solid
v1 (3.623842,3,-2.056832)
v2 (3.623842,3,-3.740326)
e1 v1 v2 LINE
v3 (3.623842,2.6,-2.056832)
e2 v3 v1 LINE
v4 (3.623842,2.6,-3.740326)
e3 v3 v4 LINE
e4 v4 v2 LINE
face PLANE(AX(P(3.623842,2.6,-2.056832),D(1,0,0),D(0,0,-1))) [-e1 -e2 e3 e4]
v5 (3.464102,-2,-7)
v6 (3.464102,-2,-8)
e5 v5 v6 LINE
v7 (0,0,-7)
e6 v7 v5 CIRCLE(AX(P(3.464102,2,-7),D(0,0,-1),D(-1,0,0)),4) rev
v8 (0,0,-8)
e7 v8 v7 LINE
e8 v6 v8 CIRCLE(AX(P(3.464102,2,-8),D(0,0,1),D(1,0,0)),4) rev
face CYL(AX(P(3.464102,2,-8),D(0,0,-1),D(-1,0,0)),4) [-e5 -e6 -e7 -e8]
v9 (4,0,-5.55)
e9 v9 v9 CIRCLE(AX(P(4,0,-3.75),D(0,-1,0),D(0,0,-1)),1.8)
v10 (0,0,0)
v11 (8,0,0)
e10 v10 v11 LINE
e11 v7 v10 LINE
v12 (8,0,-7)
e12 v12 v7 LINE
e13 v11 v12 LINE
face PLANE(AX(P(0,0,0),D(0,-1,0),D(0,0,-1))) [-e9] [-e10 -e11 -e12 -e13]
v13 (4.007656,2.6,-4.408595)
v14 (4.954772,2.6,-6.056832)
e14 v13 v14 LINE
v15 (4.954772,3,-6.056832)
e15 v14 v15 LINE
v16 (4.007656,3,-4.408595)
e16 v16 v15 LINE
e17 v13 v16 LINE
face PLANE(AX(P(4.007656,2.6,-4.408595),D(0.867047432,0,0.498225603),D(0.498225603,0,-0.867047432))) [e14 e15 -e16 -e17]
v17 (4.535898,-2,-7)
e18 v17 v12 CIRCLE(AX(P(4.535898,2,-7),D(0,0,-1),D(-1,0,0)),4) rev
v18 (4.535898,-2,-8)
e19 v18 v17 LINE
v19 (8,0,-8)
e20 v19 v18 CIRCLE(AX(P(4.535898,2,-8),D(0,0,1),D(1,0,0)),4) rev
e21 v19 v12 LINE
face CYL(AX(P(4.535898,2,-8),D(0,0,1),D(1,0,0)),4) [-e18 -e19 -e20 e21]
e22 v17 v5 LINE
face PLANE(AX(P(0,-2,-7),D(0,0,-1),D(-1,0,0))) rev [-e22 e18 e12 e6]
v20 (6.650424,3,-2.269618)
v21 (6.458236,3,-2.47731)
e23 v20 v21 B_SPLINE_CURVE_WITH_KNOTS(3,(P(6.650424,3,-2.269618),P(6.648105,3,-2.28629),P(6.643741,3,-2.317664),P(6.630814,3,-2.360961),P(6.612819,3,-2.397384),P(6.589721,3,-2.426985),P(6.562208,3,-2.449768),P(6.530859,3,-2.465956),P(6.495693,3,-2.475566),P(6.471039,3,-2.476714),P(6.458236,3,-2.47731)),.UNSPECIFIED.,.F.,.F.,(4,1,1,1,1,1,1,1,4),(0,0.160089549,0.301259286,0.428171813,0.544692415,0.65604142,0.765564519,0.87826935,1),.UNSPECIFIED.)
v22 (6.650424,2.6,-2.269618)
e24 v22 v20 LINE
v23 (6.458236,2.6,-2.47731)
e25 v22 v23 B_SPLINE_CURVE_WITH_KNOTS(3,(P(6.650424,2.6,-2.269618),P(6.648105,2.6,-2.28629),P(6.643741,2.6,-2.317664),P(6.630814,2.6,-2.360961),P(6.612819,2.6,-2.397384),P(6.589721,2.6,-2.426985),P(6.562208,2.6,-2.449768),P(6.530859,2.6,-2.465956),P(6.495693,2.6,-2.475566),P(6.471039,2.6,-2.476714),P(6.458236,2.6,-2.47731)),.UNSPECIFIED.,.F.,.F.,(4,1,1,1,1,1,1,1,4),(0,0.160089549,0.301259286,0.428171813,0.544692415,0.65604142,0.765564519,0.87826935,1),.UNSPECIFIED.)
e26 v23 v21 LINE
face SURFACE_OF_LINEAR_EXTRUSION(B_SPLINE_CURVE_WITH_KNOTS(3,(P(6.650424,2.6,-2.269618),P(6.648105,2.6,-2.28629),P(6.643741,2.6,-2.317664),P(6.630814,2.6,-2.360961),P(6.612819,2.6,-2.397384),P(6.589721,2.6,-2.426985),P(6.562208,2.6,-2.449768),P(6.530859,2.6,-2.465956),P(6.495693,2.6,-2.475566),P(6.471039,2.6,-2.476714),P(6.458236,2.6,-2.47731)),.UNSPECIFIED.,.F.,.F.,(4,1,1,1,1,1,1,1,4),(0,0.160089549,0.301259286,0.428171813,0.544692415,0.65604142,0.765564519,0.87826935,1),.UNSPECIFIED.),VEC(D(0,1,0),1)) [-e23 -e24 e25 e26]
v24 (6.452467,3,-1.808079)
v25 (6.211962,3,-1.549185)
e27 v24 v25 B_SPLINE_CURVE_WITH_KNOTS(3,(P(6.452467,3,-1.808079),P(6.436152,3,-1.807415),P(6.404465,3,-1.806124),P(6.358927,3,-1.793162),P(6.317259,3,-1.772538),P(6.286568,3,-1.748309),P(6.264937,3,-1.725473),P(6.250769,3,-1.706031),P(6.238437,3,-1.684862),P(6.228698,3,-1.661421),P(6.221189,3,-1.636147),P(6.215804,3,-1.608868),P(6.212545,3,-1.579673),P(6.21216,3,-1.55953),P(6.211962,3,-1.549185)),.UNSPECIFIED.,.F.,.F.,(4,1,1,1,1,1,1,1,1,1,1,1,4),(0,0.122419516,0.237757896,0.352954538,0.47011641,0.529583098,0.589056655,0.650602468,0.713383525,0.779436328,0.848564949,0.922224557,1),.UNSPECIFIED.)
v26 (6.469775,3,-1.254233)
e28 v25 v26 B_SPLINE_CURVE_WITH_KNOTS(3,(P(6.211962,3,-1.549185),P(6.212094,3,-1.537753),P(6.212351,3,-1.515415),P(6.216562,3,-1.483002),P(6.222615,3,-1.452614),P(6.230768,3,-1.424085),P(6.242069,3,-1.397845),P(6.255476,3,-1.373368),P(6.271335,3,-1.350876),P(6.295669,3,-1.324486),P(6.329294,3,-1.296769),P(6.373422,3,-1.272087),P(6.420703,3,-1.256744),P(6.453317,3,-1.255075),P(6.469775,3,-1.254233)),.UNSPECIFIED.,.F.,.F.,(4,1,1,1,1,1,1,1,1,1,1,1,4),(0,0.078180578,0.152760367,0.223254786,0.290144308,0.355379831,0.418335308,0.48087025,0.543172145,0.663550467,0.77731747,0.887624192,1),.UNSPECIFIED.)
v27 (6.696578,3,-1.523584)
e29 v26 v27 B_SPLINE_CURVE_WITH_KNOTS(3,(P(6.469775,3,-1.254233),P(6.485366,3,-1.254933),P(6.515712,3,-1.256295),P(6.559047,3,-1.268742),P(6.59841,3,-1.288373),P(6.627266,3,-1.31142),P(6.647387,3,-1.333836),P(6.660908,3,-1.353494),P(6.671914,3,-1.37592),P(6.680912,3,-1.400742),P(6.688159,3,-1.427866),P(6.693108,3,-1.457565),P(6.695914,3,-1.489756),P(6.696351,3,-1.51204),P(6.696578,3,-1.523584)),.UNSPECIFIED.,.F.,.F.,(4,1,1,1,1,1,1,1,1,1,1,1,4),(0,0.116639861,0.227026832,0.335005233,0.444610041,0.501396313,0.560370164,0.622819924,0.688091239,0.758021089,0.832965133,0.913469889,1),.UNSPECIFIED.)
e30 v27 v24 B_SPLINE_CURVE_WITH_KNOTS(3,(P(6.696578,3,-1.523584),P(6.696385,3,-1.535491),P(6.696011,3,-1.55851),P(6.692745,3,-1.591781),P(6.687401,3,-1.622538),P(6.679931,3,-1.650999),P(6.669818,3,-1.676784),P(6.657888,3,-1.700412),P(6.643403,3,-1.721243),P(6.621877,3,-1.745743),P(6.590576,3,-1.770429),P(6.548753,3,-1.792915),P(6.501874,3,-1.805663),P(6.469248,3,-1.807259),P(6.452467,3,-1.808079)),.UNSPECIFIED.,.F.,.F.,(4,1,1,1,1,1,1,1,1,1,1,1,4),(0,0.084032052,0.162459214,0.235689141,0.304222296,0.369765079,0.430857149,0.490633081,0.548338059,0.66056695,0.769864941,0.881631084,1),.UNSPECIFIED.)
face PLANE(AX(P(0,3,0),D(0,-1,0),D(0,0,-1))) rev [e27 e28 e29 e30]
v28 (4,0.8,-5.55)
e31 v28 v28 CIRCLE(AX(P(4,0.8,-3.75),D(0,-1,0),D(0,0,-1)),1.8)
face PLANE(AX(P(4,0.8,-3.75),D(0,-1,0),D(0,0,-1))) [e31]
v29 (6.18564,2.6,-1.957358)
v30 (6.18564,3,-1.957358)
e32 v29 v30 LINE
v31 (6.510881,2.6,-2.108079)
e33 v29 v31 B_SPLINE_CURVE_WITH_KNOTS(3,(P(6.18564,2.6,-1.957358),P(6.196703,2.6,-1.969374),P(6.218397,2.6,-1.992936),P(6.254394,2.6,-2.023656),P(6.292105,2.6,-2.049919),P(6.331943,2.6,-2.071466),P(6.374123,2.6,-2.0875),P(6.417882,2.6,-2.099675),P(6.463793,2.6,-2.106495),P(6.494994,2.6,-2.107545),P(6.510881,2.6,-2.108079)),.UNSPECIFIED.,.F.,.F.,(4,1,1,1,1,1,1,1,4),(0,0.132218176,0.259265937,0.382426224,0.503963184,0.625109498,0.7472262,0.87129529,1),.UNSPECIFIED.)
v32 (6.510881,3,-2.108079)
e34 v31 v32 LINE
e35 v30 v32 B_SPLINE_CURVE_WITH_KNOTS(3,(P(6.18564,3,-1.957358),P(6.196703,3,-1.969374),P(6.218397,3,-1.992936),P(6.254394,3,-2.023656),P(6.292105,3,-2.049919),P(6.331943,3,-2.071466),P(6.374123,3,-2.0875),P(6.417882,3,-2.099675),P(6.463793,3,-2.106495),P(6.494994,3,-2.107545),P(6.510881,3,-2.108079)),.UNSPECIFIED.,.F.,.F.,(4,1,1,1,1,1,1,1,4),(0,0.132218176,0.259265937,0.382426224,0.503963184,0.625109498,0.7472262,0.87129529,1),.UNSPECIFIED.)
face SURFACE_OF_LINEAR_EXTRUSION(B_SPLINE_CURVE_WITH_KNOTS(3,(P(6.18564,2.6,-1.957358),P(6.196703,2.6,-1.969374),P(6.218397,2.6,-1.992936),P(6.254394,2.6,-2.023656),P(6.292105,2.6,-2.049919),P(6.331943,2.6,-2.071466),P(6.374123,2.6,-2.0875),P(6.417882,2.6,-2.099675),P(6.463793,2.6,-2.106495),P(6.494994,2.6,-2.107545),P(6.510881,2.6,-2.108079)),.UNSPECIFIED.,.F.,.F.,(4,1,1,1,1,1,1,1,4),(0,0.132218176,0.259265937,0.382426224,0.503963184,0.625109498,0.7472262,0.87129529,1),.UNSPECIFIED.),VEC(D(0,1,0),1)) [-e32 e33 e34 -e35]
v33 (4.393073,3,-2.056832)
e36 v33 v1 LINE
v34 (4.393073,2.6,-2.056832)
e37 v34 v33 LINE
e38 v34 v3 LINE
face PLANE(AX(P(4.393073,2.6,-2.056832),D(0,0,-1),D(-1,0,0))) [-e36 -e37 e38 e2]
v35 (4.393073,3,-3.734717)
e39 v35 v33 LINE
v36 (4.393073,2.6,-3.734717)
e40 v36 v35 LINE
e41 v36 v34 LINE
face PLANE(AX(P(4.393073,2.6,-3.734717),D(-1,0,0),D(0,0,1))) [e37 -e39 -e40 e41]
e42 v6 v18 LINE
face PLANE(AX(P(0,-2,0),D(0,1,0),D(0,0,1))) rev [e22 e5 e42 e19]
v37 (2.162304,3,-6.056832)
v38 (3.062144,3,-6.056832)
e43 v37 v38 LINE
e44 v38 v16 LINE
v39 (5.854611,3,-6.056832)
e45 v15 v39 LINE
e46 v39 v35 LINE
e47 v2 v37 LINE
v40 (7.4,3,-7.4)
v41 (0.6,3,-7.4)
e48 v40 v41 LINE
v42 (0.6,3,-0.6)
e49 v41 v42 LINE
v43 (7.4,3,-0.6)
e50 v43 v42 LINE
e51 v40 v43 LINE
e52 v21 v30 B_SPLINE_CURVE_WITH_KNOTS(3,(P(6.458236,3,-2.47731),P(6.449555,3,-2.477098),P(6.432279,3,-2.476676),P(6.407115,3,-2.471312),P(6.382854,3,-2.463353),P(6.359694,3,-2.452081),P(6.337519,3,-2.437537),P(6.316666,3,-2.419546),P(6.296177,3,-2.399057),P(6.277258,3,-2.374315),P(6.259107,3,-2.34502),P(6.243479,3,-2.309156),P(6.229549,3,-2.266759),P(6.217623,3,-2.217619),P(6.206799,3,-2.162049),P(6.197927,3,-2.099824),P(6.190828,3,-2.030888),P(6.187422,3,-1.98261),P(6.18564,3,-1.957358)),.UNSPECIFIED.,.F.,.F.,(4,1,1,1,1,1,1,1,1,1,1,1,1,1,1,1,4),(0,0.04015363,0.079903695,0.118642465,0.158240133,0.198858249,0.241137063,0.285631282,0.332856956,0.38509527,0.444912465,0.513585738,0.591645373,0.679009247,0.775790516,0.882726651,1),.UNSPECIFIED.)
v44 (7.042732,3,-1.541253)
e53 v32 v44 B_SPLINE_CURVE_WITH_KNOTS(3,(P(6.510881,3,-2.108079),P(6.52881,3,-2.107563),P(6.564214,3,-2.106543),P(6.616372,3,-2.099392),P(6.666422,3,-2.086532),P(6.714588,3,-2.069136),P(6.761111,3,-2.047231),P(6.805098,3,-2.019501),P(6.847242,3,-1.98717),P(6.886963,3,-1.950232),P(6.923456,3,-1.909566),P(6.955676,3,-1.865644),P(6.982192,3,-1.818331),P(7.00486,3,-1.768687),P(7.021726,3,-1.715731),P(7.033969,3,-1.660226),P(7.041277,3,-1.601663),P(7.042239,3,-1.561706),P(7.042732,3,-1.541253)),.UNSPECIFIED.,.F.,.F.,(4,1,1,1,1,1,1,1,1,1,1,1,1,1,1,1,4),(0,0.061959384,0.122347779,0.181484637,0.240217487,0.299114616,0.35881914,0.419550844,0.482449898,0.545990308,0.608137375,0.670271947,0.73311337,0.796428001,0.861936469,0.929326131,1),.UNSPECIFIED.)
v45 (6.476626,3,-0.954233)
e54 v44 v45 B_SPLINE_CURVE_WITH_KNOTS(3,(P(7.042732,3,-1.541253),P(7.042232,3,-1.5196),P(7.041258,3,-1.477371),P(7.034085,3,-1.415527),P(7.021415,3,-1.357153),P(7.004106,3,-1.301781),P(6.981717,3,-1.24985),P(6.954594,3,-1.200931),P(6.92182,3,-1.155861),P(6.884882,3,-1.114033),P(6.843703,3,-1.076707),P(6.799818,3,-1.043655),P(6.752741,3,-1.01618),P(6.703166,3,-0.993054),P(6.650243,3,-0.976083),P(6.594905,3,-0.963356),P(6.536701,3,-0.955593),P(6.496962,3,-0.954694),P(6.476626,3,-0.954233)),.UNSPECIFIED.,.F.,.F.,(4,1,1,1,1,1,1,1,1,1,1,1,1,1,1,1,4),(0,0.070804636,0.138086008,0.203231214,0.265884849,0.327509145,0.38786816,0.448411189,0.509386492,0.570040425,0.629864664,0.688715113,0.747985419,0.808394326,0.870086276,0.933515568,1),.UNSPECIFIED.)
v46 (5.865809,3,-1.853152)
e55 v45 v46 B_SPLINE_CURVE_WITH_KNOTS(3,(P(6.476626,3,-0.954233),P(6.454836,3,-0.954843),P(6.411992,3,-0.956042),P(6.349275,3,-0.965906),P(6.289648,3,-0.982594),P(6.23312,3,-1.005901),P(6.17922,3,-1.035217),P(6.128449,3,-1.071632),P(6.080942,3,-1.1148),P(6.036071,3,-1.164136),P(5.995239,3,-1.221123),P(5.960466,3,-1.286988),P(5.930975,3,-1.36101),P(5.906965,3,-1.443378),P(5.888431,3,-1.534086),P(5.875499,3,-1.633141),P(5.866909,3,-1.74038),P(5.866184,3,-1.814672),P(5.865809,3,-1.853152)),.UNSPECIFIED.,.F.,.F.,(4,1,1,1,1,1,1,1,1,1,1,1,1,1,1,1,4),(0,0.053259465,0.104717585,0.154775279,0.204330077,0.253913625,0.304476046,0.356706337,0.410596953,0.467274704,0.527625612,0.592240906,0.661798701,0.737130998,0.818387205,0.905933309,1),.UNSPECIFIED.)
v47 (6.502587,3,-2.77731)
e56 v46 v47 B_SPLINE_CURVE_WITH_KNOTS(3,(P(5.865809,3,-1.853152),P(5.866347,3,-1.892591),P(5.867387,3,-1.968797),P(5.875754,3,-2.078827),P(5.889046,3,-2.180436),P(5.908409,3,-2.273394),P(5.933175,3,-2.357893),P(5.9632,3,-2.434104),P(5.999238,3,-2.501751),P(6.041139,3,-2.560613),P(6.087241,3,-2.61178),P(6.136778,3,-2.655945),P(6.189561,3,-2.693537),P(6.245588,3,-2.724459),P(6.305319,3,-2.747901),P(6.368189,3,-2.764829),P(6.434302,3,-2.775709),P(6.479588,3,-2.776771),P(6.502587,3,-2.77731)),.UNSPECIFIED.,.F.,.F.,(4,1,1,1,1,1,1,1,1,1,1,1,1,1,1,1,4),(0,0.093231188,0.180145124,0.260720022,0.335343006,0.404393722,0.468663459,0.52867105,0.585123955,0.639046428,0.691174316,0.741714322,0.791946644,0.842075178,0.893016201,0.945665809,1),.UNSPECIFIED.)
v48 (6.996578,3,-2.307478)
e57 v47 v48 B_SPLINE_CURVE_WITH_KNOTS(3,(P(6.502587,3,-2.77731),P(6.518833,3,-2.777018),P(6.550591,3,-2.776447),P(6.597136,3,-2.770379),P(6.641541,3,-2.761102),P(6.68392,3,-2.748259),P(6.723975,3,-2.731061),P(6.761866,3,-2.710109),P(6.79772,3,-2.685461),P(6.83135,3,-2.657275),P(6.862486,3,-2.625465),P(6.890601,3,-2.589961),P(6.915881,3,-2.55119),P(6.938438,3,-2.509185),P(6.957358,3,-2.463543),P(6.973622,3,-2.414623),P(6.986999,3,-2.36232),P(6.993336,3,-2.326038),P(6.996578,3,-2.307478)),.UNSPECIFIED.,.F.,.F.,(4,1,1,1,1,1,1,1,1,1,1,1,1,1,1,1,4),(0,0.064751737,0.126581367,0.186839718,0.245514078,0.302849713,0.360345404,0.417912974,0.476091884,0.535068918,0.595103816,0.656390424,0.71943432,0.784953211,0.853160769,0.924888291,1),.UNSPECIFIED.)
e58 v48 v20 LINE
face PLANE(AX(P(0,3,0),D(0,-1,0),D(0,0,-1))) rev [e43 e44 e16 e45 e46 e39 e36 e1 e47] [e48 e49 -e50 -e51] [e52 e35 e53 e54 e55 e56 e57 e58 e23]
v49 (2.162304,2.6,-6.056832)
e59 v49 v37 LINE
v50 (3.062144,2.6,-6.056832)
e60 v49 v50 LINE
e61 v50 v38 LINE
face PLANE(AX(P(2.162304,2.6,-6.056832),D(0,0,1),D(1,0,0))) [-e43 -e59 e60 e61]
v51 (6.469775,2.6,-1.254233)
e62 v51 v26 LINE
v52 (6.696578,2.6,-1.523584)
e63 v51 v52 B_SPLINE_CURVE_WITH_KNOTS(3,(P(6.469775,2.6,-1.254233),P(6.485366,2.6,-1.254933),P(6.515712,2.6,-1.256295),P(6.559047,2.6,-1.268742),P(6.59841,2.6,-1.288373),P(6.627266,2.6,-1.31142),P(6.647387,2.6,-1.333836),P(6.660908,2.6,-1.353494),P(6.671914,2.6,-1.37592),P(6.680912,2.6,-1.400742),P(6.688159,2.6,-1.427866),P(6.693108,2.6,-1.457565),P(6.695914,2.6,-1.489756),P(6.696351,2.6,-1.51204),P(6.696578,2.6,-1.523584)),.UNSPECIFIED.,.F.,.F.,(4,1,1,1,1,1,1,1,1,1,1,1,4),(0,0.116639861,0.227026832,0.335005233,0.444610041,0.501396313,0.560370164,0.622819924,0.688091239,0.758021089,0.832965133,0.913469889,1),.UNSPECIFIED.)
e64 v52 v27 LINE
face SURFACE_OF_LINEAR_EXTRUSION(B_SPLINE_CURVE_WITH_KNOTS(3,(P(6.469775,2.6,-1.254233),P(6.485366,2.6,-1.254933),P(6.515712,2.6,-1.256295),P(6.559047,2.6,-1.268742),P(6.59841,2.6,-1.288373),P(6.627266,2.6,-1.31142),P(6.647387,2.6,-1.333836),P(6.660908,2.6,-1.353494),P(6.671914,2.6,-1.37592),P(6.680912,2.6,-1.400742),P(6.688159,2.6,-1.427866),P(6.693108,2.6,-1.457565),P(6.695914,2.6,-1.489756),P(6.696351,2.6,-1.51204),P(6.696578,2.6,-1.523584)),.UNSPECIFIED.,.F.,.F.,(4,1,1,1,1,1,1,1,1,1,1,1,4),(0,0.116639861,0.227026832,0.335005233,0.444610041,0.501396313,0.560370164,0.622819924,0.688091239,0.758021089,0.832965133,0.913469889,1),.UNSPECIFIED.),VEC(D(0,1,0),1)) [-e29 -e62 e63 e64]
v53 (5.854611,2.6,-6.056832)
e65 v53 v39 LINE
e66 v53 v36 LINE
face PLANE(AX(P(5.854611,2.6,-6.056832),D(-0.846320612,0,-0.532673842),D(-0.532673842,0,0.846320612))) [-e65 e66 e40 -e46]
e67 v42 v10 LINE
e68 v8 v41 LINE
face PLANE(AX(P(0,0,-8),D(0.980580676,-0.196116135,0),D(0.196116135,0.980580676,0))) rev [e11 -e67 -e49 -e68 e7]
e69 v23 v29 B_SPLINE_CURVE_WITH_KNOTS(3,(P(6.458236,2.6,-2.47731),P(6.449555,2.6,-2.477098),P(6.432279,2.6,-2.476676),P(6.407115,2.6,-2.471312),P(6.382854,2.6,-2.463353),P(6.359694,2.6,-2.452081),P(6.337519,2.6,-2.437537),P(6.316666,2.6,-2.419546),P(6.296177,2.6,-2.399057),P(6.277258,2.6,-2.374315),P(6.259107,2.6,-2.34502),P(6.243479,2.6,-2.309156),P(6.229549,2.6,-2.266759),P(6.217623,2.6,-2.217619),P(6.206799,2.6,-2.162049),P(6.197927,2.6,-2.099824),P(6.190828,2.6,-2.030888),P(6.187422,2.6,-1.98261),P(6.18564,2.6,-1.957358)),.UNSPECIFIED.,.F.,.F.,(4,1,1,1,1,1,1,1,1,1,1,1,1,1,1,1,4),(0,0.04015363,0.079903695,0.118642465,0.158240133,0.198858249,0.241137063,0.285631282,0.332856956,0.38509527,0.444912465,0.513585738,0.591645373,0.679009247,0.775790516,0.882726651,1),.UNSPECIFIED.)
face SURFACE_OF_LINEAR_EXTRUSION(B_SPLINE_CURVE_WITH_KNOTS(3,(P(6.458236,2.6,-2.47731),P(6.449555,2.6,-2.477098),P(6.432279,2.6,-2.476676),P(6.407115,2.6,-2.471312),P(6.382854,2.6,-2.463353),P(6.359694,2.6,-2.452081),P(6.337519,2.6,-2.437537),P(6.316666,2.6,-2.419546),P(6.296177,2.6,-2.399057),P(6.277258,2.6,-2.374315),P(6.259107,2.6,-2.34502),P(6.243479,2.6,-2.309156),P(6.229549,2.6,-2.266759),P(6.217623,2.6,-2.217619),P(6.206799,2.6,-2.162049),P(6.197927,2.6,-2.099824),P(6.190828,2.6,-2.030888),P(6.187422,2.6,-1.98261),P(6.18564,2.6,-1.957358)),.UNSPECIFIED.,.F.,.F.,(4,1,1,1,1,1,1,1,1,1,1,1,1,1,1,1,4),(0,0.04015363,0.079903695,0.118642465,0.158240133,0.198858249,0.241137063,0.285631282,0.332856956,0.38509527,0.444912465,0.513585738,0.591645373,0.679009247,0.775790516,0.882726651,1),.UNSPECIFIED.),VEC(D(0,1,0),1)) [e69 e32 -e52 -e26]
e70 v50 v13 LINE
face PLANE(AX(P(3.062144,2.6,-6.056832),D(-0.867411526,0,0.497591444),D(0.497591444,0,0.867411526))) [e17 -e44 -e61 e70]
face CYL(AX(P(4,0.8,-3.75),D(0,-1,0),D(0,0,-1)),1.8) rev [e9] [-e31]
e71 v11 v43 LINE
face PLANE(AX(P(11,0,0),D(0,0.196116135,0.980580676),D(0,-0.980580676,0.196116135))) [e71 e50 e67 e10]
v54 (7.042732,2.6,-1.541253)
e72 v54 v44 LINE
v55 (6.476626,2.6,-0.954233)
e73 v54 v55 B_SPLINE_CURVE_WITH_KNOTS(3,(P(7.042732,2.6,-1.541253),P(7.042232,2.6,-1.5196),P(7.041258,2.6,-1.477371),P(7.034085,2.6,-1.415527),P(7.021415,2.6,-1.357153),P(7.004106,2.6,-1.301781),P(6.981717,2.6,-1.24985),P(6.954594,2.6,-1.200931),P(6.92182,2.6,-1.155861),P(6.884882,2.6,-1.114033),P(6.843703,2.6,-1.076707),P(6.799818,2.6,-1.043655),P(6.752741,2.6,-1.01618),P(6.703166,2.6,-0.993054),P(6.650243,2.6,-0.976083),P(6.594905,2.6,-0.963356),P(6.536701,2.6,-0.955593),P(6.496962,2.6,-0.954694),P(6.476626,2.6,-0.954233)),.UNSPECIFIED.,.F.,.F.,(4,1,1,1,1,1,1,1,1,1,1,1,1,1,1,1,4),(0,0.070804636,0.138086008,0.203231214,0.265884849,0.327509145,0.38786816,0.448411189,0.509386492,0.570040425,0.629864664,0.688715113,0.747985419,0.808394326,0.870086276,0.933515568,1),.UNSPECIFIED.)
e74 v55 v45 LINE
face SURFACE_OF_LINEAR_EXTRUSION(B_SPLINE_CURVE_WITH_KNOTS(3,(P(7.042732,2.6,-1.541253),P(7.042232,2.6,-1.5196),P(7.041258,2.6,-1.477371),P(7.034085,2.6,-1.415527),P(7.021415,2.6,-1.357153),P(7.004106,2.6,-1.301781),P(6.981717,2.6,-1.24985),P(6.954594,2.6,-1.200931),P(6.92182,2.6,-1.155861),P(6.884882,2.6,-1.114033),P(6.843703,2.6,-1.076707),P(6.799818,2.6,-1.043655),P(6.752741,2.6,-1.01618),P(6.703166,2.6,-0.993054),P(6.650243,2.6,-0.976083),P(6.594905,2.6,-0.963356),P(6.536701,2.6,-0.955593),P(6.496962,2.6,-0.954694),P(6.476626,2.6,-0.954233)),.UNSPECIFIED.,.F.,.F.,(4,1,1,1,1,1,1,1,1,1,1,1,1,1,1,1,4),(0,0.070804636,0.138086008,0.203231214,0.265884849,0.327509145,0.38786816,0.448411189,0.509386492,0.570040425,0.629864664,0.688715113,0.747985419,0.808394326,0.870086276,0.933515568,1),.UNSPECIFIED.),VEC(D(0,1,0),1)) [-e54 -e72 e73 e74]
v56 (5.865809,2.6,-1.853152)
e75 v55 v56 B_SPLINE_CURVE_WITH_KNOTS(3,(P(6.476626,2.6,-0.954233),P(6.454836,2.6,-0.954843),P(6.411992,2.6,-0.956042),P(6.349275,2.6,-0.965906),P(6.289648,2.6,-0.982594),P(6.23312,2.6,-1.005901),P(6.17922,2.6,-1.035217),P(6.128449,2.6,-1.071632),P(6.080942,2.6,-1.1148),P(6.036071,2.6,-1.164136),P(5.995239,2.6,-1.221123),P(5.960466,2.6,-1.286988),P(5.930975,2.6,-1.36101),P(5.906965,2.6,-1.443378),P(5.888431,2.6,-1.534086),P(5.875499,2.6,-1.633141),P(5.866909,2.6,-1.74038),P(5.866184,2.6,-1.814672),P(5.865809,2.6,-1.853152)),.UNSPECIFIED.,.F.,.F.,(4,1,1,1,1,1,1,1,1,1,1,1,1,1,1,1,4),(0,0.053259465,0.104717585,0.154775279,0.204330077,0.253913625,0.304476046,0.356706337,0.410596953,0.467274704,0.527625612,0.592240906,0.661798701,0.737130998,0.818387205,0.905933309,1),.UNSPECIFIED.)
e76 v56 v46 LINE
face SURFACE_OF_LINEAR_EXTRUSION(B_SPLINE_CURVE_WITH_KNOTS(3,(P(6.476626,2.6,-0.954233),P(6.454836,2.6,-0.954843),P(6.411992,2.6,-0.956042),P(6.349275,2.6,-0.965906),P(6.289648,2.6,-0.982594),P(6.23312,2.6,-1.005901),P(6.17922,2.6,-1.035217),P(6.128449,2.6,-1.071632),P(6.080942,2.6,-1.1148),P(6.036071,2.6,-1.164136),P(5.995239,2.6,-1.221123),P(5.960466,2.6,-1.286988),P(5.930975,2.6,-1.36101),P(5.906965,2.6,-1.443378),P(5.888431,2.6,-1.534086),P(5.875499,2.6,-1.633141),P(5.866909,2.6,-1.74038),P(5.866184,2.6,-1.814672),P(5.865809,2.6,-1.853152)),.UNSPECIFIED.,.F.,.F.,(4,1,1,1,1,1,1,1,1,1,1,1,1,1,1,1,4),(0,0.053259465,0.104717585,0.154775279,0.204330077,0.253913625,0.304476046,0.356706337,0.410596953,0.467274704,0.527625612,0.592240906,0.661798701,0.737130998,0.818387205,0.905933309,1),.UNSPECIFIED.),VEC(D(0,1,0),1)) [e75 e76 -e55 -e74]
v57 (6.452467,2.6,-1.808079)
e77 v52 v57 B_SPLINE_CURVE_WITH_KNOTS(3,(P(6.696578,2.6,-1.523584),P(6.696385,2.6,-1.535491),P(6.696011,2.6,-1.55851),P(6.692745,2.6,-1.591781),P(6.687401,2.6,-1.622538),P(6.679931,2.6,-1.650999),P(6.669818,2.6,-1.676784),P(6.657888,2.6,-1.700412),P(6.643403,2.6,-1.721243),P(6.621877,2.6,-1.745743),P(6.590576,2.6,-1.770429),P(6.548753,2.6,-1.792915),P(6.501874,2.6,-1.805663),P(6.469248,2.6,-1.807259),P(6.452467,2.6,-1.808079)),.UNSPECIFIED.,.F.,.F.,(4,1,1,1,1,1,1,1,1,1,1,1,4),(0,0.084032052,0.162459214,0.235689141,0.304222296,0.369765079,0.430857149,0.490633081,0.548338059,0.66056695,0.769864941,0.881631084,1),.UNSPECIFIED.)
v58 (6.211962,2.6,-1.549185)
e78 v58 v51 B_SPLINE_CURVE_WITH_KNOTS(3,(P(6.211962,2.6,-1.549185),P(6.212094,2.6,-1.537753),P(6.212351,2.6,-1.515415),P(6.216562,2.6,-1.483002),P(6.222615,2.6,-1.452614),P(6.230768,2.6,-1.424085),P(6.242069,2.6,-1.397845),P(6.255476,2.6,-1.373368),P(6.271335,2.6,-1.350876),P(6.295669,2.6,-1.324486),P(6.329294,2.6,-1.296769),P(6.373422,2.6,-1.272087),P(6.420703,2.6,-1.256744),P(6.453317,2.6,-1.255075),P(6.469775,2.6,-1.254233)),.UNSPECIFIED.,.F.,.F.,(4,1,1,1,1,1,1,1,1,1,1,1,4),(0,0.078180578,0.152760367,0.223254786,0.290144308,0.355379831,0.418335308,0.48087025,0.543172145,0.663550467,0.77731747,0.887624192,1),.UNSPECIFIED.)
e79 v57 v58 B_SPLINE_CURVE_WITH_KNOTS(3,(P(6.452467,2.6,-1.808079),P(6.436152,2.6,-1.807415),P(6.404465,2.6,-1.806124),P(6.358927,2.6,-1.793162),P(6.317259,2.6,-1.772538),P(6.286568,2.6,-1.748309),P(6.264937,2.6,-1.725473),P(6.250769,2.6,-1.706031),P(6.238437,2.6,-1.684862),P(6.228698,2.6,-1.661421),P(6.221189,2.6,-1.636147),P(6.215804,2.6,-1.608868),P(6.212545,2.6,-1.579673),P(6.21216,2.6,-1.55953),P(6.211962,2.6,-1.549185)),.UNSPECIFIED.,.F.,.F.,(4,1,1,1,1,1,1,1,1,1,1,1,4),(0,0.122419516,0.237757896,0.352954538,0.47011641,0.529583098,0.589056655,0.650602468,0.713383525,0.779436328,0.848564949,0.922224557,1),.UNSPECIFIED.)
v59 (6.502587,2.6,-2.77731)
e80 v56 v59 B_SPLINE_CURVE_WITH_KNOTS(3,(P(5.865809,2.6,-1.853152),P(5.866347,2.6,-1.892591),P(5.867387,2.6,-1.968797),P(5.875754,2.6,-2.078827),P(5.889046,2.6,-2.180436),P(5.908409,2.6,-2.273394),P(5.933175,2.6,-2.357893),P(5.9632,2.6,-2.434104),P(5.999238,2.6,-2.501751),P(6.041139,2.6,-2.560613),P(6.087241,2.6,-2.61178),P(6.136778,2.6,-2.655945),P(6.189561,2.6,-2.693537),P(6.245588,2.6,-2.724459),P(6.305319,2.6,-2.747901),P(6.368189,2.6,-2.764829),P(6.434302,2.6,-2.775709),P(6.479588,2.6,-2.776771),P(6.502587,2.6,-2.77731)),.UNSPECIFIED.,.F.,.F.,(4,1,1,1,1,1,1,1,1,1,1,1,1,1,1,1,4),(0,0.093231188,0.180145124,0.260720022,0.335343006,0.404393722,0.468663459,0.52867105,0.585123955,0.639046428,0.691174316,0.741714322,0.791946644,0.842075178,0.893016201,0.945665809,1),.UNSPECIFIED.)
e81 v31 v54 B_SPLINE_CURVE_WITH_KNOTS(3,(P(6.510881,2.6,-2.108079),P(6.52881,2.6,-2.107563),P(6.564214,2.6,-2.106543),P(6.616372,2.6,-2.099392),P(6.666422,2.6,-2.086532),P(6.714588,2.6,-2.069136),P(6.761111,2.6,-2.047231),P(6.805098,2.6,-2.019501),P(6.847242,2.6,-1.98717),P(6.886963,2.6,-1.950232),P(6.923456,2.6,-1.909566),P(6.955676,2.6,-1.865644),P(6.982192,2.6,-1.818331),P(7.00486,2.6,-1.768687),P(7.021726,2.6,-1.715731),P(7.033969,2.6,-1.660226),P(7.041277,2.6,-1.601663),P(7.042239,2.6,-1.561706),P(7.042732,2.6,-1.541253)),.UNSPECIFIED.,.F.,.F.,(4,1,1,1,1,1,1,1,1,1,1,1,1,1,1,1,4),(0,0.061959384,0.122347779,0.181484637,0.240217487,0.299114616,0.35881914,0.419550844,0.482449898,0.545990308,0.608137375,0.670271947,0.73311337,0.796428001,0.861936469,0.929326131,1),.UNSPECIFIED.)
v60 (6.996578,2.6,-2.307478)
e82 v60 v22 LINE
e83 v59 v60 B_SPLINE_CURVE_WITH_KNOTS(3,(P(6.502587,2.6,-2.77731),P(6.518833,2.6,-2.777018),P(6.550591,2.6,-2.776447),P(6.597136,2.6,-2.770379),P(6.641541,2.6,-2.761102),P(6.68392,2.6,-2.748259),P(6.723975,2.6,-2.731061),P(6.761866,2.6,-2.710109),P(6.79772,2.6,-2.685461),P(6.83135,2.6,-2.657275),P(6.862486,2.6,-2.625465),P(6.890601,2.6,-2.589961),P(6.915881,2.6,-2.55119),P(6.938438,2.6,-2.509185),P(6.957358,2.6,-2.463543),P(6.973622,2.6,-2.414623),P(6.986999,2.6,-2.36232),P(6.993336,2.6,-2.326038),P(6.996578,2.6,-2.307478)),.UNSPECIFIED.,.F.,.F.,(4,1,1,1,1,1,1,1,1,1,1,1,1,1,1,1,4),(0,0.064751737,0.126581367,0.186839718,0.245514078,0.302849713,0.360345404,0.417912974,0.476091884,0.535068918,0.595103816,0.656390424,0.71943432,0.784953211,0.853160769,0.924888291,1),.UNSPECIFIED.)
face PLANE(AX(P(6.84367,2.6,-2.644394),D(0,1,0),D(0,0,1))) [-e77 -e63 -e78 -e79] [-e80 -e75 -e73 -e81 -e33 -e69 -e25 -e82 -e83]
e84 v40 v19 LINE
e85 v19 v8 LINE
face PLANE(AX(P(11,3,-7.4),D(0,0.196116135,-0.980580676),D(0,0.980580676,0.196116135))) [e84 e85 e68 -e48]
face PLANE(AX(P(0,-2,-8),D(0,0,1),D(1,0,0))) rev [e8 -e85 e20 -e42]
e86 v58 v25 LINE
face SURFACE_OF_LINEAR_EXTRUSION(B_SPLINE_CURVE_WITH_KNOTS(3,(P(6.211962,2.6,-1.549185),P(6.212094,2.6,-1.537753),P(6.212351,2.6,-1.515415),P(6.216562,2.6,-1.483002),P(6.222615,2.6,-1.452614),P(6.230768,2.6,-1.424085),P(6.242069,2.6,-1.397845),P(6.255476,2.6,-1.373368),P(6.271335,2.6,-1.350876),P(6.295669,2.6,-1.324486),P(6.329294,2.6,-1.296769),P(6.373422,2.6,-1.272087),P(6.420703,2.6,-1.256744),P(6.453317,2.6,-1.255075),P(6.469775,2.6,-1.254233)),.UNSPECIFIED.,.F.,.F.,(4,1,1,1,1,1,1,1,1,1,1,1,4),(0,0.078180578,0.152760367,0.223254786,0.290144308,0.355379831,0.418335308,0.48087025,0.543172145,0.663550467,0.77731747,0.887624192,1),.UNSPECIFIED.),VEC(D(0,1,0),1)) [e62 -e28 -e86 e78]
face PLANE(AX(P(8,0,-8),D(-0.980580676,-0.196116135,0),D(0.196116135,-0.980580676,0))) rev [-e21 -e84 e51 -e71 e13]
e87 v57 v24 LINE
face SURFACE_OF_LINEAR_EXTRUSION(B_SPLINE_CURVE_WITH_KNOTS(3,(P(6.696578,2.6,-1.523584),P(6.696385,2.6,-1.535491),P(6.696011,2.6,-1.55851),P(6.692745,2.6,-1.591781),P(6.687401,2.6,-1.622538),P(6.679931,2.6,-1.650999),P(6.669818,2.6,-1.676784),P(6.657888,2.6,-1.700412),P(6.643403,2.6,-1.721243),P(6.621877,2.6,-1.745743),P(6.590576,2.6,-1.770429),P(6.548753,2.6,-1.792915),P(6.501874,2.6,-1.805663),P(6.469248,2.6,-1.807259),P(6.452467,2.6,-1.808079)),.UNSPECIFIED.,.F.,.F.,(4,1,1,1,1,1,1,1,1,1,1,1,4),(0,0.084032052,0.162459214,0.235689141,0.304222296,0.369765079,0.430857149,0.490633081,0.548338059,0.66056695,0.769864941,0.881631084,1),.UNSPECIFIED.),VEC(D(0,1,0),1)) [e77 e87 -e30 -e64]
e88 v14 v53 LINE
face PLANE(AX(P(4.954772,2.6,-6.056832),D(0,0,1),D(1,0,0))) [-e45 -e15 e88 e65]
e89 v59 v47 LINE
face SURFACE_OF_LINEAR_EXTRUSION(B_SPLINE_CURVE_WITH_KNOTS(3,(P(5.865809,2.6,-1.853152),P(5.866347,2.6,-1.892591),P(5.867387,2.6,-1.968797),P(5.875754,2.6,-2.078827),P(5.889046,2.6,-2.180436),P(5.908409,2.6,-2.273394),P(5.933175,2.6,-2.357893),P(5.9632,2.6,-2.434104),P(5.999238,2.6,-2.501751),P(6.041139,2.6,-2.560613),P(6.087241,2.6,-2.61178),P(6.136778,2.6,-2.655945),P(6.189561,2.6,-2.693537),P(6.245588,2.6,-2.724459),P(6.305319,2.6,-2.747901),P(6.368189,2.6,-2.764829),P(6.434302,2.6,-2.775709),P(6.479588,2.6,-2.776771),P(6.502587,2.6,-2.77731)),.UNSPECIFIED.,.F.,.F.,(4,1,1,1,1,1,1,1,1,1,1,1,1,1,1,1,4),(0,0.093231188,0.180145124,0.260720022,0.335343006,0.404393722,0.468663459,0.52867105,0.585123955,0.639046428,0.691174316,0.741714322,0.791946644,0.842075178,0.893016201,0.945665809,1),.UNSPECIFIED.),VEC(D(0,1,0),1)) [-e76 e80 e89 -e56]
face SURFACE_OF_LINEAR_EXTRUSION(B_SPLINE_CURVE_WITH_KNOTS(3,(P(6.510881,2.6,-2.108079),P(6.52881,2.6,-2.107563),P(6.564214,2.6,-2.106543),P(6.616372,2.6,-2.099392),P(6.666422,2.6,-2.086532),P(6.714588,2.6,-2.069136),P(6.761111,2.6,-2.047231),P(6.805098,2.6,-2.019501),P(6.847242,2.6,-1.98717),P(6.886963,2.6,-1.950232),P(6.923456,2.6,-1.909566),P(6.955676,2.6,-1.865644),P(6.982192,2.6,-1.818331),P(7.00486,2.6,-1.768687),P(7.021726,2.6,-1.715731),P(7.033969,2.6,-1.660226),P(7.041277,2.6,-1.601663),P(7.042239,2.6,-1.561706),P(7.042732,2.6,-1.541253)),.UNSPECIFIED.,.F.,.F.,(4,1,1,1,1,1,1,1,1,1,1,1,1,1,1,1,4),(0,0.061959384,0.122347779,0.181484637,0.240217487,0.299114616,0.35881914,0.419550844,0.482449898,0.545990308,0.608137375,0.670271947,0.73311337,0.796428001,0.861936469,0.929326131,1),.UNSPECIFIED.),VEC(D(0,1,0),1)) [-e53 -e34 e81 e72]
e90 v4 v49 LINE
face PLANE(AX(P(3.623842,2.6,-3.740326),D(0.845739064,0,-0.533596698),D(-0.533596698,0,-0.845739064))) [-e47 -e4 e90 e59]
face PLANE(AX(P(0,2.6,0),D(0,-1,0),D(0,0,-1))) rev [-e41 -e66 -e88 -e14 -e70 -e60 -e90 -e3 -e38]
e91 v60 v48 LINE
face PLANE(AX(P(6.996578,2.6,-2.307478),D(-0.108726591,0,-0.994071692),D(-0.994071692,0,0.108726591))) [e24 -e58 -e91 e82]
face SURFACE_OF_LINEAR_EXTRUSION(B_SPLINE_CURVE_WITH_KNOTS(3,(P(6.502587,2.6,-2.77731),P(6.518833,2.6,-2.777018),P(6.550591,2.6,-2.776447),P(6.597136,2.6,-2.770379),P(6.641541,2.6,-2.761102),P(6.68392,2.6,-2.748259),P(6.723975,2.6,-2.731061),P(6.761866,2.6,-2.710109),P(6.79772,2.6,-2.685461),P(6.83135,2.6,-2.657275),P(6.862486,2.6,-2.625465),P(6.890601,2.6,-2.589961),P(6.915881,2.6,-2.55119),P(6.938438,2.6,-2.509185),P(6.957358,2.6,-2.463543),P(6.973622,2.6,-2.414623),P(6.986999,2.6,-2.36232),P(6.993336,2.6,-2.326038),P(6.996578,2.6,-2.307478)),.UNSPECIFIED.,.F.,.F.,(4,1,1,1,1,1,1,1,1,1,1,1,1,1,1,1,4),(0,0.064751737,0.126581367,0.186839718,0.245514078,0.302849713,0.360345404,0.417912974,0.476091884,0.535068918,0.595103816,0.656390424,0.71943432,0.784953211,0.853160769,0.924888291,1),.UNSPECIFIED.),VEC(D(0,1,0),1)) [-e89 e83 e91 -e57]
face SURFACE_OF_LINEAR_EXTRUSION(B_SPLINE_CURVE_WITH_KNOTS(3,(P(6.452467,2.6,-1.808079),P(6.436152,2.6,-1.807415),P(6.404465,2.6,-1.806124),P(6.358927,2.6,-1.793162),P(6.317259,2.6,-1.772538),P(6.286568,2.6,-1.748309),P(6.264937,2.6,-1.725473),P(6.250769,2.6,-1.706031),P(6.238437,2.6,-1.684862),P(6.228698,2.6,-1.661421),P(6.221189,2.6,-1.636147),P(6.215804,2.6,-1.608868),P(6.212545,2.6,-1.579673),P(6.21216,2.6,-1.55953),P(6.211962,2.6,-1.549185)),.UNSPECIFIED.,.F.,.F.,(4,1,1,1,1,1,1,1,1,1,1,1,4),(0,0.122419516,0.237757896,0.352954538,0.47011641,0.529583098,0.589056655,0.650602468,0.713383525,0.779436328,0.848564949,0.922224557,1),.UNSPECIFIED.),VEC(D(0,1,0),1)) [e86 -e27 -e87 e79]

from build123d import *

# Parameters (mm, degrees)
SKETCH1_W               = 8
SKETCH1_H               = 8
BOSS_EXTRUDE1_DEPTH     = 3
CUT_EXTRUDE1_DEPTH      = 12.704699911
CUT_EXTRUDE1_DEPTH_BACK = 12.704699911
CUT_EXTRUDE2_DEPTH      = 11
SKETCH4_R               = 1.8
CUT_EXTRUDE3_DEPTH      = 0.8
SKETCH5_W               = 8
SKETCH5_H               = 1
BOSS_EXTRUDE2_DEPTH     = 2
FILLET1_R               = 4
CUT_EXTRUDE4_DEPTH      = 0.4
CUT_EXTRUDE5_DEPTH      = 0.4


with BuildPart() as part:
    # Sketch1 → Boss-Extrude1 (new body)
    with BuildSketch(Plane(origin=(0, 0, 0), x_dir=(1, 0, 0), z_dir=(0, 1, 0))):
        with Locations((4, 4)):
            Rectangle(SKETCH1_W, SKETCH1_H)
    extrude(amount=BOSS_EXTRUDE1_DEPTH)

    # Sketch2 → Cut-Extrude1 (cut, two sides: drawn at the far end of the back side and taken through both)
    with BuildSketch(Plane.XY.offset(-CUT_EXTRUDE1_DEPTH_BACK)):
        Polygon((0, 0), (0.6, 3), (0, 3), align=None)
        Polygon((8, 0), (7.4, 3), (8, 3), align=None)
    extrude(amount=CUT_EXTRUDE1_DEPTH + CUT_EXTRUDE1_DEPTH_BACK, mode=Mode.SUBTRACT)

    # Sketch3 → Cut-Extrude2 (cut)
    with BuildSketch(Plane(origin=(0, 0, 0), x_dir=(0, 0, -1), z_dir=(1, 0, 0))):
        Polygon((0, 0), (0.6, 3), (0, 3), align=None)
        Polygon((8, 3), (7.4, 3), (8, 0), align=None)
    extrude(amount=CUT_EXTRUDE2_DEPTH, mode=Mode.SUBTRACT)

    # Sketch4 → Cut-Extrude3 (cut)
    with BuildSketch(Plane.XZ):
        with Locations(Location((4, -3.75, 0), (0, 0, 270))):
            Circle(SKETCH4_R)
    extrude(amount=-CUT_EXTRUDE3_DEPTH, mode=Mode.SUBTRACT)

    # Sketch5 → Boss-Extrude2 (add)
    with BuildSketch(Plane.XZ):
        with Locations((4, -7.5)):
            Rectangle(SKETCH5_W, SKETCH5_H)
    extrude(amount=BOSS_EXTRUDE2_DEPTH)

    # Fillet1
    # the kernel refuses this fillet: 4 mm, written as the material it takes off along each edge
    with BuildSketch(Plane(origin=(8, -2, -16.660254038), x_dir=(0, 1, 0), z_dir=(0, 0, 1)), Plane(origin=(0, -2, 1.660254038), x_dir=(0, 1, 0), z_dir=(0, 0, -1))) as fillet1_piece_1:
        with BuildLine():
            CenterArc((4, 3.464101615), FILLET1_R, 180, 60)
            Line((0, 3.464101615), (-0.08, 3.464101615))
            Line((-0.08, 3.464101615), (-0.08, 0))
            Line((-0.08, 0), (0, -0.08))
            ThreePointArc((0, -0.08), (1, -0.08), (1.96, -0.069282032))
            Line((1.96, -0.069282032), (2, 0))
        make_face()
    extrude(amount=18.320508076, mode=Mode.SUBTRACT)

    # Sketch6 → Cut-Extrude4 (cut)
    with BuildSketch(Plane(origin=(0, 3, 0), x_dir=(1, 0, 0), z_dir=(0, 1, 0))):
        Polygon((3.623842243, 2.056832464), (3.623842243, 3.740326053), (2.162303782, 6.056832464), (3.062143525, 6.056832464), (4.007656346, 4.408595284), (4.95477173, 6.056832464), (5.854611474, 6.056832464), (4.393073013, 3.734717079), (4.393073013, 2.056832464), align=None)
    extrude(amount=-CUT_EXTRUDE4_DEPTH, mode=Mode.SUBTRACT)

    # Sketch7 → Cut-Extrude5 (cut)
    with BuildSketch(Plane(origin=(0, 3, 0), x_dir=(1, 0, 0), z_dir=(0, 1, 0))):
        with BuildLine():
            Line((6.99657775, 2.307478491), (6.650423904, 2.269617914))
            add(Edge.make_bspline(
                [(6.650423904, 2.269617914), (6.648104786, 2.286290214), (6.643740629, 2.317664439), (6.630814222, 2.360960848), (6.6128192, 2.397384178), (6.589720846, 2.426985356), (6.562208273, 2.449767653), (6.53085918, 2.465955864), (6.495693494, 2.475565581), (6.471038508, 2.476713937), (6.458236404, 2.477310221)],
                knots=[0, 0, 0, 0, 1.280716388, 2.410074291, 3.425374506, 4.35753932, 5.248331359, 6.12451615, 7.026154803, 8, 8, 8, 8], degree=3))
            add(Edge.make_bspline(
                [(6.458236404, 2.477310221), (6.449554942, 2.477097941), (6.432279271, 2.476675513), (6.407115159, 2.471312362), (6.382853927, 2.463353411), (6.359693582, 2.452081234), (6.337518567, 2.437536581), (6.316665994, 2.419545601), (6.296177185, 2.39905664), (6.277258092, 2.37431526), (6.259107425, 2.34501973), (6.243478966, 2.309156475), (6.229549311, 2.266758815), (6.217622545, 2.217619097), (6.206799126, 2.162049229), (6.197926997, 2.099824257), (6.190827571, 2.030888275), (6.1874217, 1.982610246), (6.18564025, 1.957358298)],
                knots=[0, 0, 0, 0, 0.642458078, 1.278459126, 1.898279436, 2.531842133, 3.181731979, 3.858193002, 4.57010051, 5.325711302, 6.161524323, 7.118599443, 8.217371811, 9.466325973, 10.864147948, 12.412648259, 14.123626419, 16, 16, 16, 16], degree=3))
            add(Edge.make_bspline(
                [(6.18564025, 1.957358298), (6.196703374, 1.969374309), (6.218396997, 1.992936442), (6.254393564, 2.023656049), (6.292105324, 2.049919261), (6.331942634, 2.071465901), (6.374122941, 2.087500286), (6.417882183, 2.099674887), (6.463793169, 2.1064945), (6.494994081, 2.107544715), (6.510880634, 2.108079452)],
                knots=[0, 0, 0, 0, 1.057745406, 2.074127497, 3.059409796, 4.031705469, 5.000875988, 5.977809597, 6.970362319, 8, 8, 8, 8], degree=3))
            add(Edge.make_bspline(
                [(6.510880634, 2.108079452), (6.528809934, 2.107563089), (6.564213931, 2.106543456), (6.616372239, 2.099391957), (6.666421561, 2.086532277), (6.714588312, 2.069136373), (6.761110551, 2.047230594), (6.805098359, 2.019501147), (6.847242227, 1.987169858), (6.886962554, 1.950231753), (6.923455982, 1.909566001), (6.95567607, 1.865643773), (6.982192143, 1.818330938), (7.00486021, 1.76868676), (7.021726117, 1.715731209), (7.033968982, 1.660226315), (7.04127711, 1.601662587), (7.042239139, 1.561706039), (7.042731596, 1.541252529)],
                knots=[0, 0, 0, 0, 0.99135015, 1.957564468, 2.903754199, 3.843479786, 4.78583385, 5.741106244, 6.712813504, 7.719198368, 8.735844933, 9.730198001, 10.724351158, 11.729813921, 12.742848014, 13.790983496, 14.86921809, 16, 16, 16, 16], degree=3))
            add(Edge.make_bspline(
                [(7.042731596, 1.541252529), (7.042231952, 1.519599685), (7.041257525, 1.477371451), (7.034085066, 1.415527203), (7.021415455, 1.357153196), (7.004106031, 1.301781092), (6.981716795, 1.249849655), (6.954594052, 1.200930916), (6.921819947, 1.155860856), (6.884881845, 1.114033218), (6.84370317, 1.076707467), (6.799818397, 1.043655074), (6.752740779, 1.016179585), (6.703166183, 0.993054256), (6.650243128, 0.9760833), (6.594904638, 0.963355935), (6.536700741, 0.955593381), (6.496962304, 0.954693712), (6.476625827, 0.954233298)],
                knots=[0, 0, 0, 0, 1.13287417, 2.209376133, 3.25169942, 4.254157582, 5.240146322, 6.205890558, 7.174579019, 8.150183866, 9.1206468, 10.07783463, 11.019441811, 11.967766696, 12.934309213, 13.921380422, 14.936249089, 16, 16, 16, 16], degree=3))
            add(Edge.make_bspline(
                [(6.476625827, 0.954233298), (6.454835686, 0.954842926), (6.411992392, 0.956041562), (6.349274568, 0.965905733), (6.289647802, 0.982594351), (6.233119501, 1.005900716), (6.179219819, 1.035216515), (6.128449255, 1.071632083), (6.080942348, 1.114800151), (6.036070744, 1.164136126), (5.995238787, 1.221123075), (5.960465944, 1.286988003), (5.930975089, 1.361009558), (5.906965213, 1.443377578), (5.888431321, 1.534085529), (5.875498792, 1.633141016), (5.86690889, 1.740380226), (5.866183985, 1.814672002), (5.865808519, 1.853151567)],
                knots=[0, 0, 0, 0, 0.852151446, 1.675481364, 2.476404467, 3.269281233, 4.062617998, 4.871616733, 5.707301388, 6.56955125, 7.476395267, 8.442009786, 9.475854496, 10.58877921, 11.794095973, 13.094195288, 14.494932947, 16, 16, 16, 16], degree=3))
            add(Edge.make_bspline(
                [(5.865808519, 1.853151567), (5.866346697, 1.892590697), (5.867386586, 1.968796599), (5.875754473, 2.078827487), (5.889046125, 2.180436336), (5.908408745, 2.273394012), (5.933175033, 2.357893394), (5.963200156, 2.434104295), (5.99923844, 2.501750812), (6.041138584, 2.560612949), (6.087240817, 2.61177964), (6.136777869, 2.655945181), (6.189560624, 2.693536639), (6.245587817, 2.724459089), (6.305319384, 2.747901225), (6.368188753, 2.764829378), (6.434301522, 2.775708833), (6.479587723, 2.776770851), (6.502587365, 2.777310221)],
                knots=[0, 0, 0, 0, 1.491699013, 2.882321987, 4.171520357, 5.365488089, 6.470299549, 7.49861535, 8.458736801, 9.361983288, 10.224742848, 11.058789056, 11.867429157, 12.671146298, 13.473202851, 14.288259215, 15.130652936, 16, 16, 16, 16], degree=3))
            add(Edge.make_bspline(
                [(6.502587365, 2.777310221), (6.518832845, 2.777017956), (6.550590682, 2.776446616), (6.597136362, 2.770379458), (6.641540508, 2.76110179), (6.683919501, 2.748259344), (6.723974963, 2.731060825), (6.761865954, 2.710109046), (6.797719857, 2.685460752), (6.831350121, 2.657274635), (6.862486078, 2.625465393), (6.890601127, 2.589961055), (6.915881459, 2.551190115), (6.938437714, 2.509184749), (6.957357529, 2.46354265), (6.973622233, 2.414622738), (6.98699882, 2.362319913), (6.993336088, 2.326037695), (6.99657775, 2.307478491)],
                knots=[0, 0, 0, 0, 1.036027791, 2.025301876, 2.989435482, 3.928225244, 4.845595412, 5.765526461, 6.686607585, 7.61747015, 8.561102691, 9.521661062, 10.50224679, 11.510949117, 12.559251378, 13.650572309, 14.798212656, 16, 16, 16, 16], degree=3))
        make_face()
        with BuildLine():
            add(Edge.make_bspline(
                [(6.211962365, 1.549185221), (6.212093793, 1.537753077), (6.212350595, 1.515415322), (6.216561681, 1.483001611), (6.222614755, 1.452614338), (6.230767911, 1.42408476), (6.242068736, 1.397844656), (6.255476173, 1.373367715), (6.271335314, 1.350875727), (6.295669246, 1.324486058), (6.329294099, 1.29676891), (6.373421783, 1.272086886), (6.420703408, 1.256744198), (6.453316703, 1.255075433), (6.469774865, 1.254233298)],
                knots=[0, 0, 0, 0, 0.93816693, 1.833124408, 2.679057427, 3.481731691, 4.264557977, 5.020023694, 5.770442996, 6.518065735, 7.962605608, 9.32780964, 10.651490302, 12, 12, 12, 12], degree=3))
            add(Edge.make_bspline(
                [(6.469774865, 1.254233298), (6.485365796, 1.254933043), (6.51571185, 1.256295021), (6.559046727, 1.268742487), (6.598409917, 1.288373431), (6.627266187, 1.311420354), (6.647387039, 1.333836313), (6.660907792, 1.353494474), (6.671913698, 1.375919542), (6.680911589, 1.400742183), (6.688159323, 1.427866383), (6.693107691, 1.457564676), (6.69591447, 1.48975573), (6.696351403, 1.512040132), (6.69657775, 1.52358426)],
                knots=[0, 0, 0, 0, 1.399678333, 2.724321989, 4.020062797, 5.33532049, 6.016755754, 6.724441967, 7.473839083, 8.257094862, 9.096253071, 9.995581596, 10.961638663, 12, 12, 12, 12], degree=3))
            add(Edge.make_bspline(
                [(6.69657775, 1.52358426), (6.696384678, 1.535490976), (6.696011412, 1.558510238), (6.692745041, 1.591780733), (6.687401372, 1.622537963), (6.679930507, 1.650999261), (6.669817892, 1.676783929), (6.657887501, 1.700412041), (6.643402955, 1.721242874), (6.621876525, 1.745742616), (6.590576263, 1.770429427), (6.548753213, 1.792915191), (6.501874013, 1.805662518), (6.469248141, 1.807258544), (6.452467173, 1.808079452)],
                knots=[0, 0, 0, 0, 1.008384627, 1.949510571, 2.828269698, 3.650667555, 4.437180943, 5.170285793, 5.887596972, 6.580056709, 7.926803404, 9.238379296, 10.579573008, 12, 12, 12, 12], degree=3))
            add(Edge.make_bspline(
                [(6.452467173, 1.808079452), (6.436151813, 1.807414866), (6.404464825, 1.806124136), (6.358926875, 1.793162443), (6.31725918, 1.772538153), (6.286568407, 1.748308757), (6.264936989, 1.725473324), (6.25076935, 1.706030549), (6.238437114, 1.684862342), (6.228698053, 1.661421349), (6.221189386, 1.636147459), (6.215803903, 1.608867965), (6.212544961, 1.579673333), (6.212160051, 1.559530412), (6.211962365, 1.549185221)],
                knots=[0, 0, 0, 0, 1.469034193, 2.853094746, 4.235454457, 5.641396914, 6.354997179, 7.06867986, 7.807229614, 8.560602297, 9.353235934, 10.182779392, 11.06669468, 12, 12, 12, 12], degree=3))
        make_face(mode=Mode.SUBTRACT)
    extrude(amount=-CUT_EXTRUDE5_DEPTH, mode=Mode.SUBTRACT)


solid = part.part
